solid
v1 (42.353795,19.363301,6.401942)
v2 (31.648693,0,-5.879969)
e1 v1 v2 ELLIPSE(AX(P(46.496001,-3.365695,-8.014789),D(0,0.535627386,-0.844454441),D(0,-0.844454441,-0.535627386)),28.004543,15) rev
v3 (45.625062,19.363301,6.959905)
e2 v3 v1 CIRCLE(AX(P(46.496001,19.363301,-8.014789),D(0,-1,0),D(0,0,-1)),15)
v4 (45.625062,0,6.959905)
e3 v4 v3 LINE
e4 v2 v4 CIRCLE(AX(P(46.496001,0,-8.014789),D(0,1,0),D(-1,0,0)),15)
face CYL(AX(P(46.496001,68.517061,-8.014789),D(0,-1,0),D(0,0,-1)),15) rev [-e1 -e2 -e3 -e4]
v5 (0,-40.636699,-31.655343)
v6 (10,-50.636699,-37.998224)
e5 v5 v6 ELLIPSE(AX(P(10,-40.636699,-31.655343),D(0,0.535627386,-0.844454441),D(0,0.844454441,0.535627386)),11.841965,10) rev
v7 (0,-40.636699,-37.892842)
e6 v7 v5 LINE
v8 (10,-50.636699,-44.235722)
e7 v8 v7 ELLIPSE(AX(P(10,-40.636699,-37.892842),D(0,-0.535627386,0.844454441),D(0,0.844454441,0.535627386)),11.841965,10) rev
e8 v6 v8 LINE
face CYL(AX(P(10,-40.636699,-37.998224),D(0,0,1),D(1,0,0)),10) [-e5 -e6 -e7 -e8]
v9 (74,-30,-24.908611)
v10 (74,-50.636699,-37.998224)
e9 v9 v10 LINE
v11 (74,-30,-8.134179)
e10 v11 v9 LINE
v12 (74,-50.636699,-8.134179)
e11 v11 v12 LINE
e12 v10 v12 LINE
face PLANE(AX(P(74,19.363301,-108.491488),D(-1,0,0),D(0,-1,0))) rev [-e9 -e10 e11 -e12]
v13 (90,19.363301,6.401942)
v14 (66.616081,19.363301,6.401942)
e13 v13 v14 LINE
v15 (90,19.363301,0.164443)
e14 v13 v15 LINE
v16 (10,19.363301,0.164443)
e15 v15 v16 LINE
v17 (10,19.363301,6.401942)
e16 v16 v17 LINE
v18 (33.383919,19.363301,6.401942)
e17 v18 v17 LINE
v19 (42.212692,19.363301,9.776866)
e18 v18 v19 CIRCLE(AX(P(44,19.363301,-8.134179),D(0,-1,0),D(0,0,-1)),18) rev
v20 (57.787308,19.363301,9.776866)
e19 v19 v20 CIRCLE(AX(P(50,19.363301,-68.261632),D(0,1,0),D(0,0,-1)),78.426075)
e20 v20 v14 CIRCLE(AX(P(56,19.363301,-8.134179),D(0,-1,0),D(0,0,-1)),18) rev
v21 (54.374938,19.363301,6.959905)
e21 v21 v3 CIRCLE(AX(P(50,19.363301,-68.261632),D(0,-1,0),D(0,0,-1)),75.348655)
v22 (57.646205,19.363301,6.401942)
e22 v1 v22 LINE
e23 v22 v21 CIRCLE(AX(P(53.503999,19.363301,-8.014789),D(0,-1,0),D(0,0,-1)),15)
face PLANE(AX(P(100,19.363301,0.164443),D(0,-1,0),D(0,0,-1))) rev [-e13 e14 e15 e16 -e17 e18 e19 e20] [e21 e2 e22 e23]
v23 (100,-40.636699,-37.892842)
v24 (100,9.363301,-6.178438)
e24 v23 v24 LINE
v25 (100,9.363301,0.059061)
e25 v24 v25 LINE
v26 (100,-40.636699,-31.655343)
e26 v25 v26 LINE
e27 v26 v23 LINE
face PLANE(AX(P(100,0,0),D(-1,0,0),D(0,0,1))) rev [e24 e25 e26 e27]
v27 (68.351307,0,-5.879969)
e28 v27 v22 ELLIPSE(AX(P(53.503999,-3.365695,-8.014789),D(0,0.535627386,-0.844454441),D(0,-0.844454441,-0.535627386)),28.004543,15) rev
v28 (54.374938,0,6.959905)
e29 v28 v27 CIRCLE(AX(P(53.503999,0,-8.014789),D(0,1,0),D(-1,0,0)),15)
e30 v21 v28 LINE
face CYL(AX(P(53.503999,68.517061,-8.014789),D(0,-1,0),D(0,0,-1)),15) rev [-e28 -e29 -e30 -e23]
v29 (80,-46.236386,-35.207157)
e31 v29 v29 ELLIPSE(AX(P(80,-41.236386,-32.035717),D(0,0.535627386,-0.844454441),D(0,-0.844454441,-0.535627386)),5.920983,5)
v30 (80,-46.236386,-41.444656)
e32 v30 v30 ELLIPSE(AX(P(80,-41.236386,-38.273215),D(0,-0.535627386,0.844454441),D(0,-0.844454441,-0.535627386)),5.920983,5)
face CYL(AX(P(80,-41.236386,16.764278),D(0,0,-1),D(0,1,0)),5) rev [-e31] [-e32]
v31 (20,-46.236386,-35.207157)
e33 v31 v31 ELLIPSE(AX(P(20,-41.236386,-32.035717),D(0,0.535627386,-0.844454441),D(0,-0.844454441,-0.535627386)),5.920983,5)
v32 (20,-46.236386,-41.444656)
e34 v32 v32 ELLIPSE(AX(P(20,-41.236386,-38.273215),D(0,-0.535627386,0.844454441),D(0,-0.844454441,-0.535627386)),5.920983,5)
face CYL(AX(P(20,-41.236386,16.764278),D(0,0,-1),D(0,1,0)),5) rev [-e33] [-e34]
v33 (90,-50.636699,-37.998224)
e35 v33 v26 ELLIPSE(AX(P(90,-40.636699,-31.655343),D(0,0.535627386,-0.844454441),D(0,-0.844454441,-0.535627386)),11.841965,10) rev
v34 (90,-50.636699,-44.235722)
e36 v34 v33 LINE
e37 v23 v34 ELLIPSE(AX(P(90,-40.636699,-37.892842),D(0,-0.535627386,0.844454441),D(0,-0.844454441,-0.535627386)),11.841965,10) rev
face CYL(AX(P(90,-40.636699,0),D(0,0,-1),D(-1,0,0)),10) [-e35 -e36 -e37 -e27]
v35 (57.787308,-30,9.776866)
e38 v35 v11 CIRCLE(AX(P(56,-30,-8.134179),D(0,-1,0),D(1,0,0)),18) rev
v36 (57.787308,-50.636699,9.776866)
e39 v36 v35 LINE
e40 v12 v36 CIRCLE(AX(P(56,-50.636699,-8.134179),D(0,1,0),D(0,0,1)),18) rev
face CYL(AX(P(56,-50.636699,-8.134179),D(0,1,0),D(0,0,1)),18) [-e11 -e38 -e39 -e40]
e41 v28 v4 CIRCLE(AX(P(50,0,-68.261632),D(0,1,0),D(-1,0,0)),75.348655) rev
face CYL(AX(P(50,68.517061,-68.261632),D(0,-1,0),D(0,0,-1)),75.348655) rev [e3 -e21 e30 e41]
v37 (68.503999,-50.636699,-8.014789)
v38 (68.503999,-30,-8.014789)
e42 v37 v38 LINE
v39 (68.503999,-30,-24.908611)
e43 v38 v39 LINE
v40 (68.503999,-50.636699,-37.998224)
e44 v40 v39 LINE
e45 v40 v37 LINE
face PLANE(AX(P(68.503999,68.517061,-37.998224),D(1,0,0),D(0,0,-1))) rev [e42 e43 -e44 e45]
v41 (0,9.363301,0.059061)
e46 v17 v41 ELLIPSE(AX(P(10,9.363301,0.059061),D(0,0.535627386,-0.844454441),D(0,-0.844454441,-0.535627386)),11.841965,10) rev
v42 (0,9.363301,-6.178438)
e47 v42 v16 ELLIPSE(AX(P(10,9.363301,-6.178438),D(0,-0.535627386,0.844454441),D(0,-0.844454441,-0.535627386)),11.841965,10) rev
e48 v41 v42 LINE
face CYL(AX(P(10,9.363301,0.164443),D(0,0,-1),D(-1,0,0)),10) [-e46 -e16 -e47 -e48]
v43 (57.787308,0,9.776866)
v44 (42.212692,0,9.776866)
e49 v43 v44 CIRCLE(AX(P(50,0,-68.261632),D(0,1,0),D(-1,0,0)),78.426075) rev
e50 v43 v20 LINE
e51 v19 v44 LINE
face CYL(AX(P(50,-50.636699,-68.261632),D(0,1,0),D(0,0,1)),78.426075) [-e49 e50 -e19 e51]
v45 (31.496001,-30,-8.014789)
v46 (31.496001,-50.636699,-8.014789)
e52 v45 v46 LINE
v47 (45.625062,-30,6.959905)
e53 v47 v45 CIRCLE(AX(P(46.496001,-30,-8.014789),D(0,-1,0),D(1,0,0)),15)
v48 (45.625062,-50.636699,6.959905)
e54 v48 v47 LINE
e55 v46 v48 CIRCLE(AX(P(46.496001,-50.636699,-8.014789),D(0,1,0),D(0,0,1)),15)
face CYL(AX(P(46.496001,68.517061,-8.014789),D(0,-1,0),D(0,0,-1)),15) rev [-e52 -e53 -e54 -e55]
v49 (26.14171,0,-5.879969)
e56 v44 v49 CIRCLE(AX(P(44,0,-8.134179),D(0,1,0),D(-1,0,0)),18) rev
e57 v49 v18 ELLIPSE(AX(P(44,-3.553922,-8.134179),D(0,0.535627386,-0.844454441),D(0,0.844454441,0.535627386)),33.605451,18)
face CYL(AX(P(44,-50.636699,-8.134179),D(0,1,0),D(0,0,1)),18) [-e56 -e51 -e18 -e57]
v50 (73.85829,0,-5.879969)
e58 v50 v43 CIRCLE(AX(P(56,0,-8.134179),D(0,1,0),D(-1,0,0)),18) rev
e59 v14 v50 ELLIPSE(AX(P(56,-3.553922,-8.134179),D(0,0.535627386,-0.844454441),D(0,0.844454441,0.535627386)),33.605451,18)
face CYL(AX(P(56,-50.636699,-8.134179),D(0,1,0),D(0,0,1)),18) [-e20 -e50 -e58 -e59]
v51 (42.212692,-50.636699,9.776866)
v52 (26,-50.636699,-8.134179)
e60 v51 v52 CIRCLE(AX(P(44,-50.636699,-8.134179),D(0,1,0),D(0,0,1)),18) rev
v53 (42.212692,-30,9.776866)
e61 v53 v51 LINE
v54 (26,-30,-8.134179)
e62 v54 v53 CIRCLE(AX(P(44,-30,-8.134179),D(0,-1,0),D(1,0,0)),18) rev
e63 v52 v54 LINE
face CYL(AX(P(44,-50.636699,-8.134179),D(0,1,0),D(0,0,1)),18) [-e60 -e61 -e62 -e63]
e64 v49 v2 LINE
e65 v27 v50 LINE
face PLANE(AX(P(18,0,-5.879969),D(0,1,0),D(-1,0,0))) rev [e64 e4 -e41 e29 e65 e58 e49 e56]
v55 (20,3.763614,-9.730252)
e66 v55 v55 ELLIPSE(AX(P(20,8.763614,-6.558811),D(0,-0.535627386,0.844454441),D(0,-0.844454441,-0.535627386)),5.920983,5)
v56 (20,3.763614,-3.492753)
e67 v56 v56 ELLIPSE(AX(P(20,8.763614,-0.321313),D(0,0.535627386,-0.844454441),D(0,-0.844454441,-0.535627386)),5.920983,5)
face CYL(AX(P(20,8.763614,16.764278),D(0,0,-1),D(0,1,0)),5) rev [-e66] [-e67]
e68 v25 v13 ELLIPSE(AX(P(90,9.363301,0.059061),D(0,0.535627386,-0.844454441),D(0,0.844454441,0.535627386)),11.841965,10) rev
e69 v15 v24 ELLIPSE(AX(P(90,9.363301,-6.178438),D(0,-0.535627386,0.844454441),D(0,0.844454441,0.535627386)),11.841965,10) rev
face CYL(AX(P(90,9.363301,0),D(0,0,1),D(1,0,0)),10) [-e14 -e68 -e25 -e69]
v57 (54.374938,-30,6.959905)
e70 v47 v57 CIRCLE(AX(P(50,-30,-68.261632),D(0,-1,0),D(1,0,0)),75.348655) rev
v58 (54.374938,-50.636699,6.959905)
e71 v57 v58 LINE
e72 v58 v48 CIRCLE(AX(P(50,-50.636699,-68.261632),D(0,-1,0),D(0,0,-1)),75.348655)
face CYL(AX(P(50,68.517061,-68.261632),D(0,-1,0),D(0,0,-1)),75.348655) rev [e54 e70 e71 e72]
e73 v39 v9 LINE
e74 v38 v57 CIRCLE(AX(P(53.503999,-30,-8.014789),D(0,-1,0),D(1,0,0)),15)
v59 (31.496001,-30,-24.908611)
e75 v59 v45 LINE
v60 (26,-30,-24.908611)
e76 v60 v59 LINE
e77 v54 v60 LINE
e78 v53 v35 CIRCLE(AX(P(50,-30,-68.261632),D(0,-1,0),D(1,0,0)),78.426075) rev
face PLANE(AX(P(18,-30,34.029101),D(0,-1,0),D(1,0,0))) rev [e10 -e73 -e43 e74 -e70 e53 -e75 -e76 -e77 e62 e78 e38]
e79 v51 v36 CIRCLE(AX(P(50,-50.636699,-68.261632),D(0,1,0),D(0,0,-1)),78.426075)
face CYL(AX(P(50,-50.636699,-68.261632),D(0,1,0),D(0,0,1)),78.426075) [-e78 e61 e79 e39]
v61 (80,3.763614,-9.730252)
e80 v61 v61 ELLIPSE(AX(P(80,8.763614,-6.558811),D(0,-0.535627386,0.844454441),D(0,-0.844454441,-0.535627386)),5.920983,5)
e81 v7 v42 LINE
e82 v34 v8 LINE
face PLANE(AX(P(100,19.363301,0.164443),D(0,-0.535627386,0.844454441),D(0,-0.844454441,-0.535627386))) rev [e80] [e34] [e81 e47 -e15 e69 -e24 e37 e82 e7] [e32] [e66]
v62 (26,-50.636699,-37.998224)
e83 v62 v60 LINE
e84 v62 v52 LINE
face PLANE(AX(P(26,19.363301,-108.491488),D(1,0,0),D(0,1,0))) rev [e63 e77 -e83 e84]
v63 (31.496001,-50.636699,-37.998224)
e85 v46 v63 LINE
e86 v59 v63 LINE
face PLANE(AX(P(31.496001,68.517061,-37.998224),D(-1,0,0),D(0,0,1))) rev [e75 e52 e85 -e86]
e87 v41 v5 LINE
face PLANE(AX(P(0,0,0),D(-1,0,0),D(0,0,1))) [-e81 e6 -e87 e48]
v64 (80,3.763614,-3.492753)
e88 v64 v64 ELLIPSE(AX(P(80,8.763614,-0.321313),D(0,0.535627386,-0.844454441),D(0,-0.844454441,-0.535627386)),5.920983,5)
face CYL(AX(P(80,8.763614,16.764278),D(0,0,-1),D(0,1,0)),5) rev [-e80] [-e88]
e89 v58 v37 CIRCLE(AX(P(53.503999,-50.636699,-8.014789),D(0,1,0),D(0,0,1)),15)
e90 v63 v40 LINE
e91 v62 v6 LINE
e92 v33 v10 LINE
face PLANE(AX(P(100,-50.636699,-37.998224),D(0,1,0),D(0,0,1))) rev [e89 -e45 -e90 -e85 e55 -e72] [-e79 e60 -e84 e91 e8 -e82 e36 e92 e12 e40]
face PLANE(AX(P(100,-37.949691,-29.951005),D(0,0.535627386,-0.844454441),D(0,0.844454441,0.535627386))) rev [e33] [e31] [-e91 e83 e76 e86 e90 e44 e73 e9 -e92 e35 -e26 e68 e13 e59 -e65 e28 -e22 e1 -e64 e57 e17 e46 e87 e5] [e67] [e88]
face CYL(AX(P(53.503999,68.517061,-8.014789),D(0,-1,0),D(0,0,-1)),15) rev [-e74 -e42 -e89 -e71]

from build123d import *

# Parameters (mm, degrees)
BOSS_EXTRUDE1_DEPTH = 100
SKETCH2_R           = 5
CUT_EXTRUDE1_DEPTH  = 61
BOSS_EXTRUDE3_DEPTH = 70
BOSS_EXTRUDE4_REACH = 124.997
SKETCH4_W           = 48
SKETCH4_H           = 70
CUT_EXTRUDE2_REACH  = 131.834
FILLET1_R           = 10
CUT_EXTRUDE3_DEPTH  = 56
FILLET3_R           = 18
FILLET4_R           = 15
FILLET5_R           = 15


with BuildPart() as part:
    # Sketch1 → Boss-Extrude1 (new body)
    with BuildSketch(Plane(origin=(0, 0, 0), x_dir=(0, 0, -1), z_dir=(1, 0, 0))):
        Polygon((9.31960102, -5.422823355), (-6.40194197, 19.363300607), (-0.164443236, 19.363300607), (44.235722397, -50.636699393), (37.998223663, -50.636699393), (29.951005386, -37.94969088), align=None)
    extrude(amount=BOSS_EXTRUDE1_DEPTH)

    # Sketch2 → Cut-Extrude1 (cut)
    with BuildSketch(Plane(origin=(0, 0, -44.235722397), x_dir=(-1, 0, 0), z_dir=(0, 0, -1))):
        with Locations(Location((-80, -41.23638567, 0), (0, 0, 270))):
            Circle(SKETCH2_R)
        with Locations(Location((-20, -41.23638567, 0), (0, 0, 270))):
            Circle(SKETCH2_R)
        with Locations(Location((-20, 8.76361433, 0), (0, 0, 270))):
            Circle(SKETCH2_R)
        with Locations(Location((-80, 8.76361433, 0), (0, 0, 270))):
            Circle(SKETCH2_R)
    extrude(amount=-CUT_EXTRUDE1_DEPTH, mode=Mode.SUBTRACT)

    # Boss-Extrude4: up to this face of the body (flat: up to its plane)
    boss_extrude4_end = Plane(part.part.faces().sort_by_distance((50, -15.608520887, -15.780267556))[0])
    # Sketch4 → Boss-Extrude4 (add, up to the picked face)
    with BuildSketch(Plane(origin=(0, 0, 6.40194197), x_dir=(-1, 0, 0), z_dir=(0, 0, -1)), mode=Mode.PRIVATE) as boss_extrude4_sk1:
        with Locations((-50, -15.636699393)):
            Rectangle(SKETCH4_W, SKETCH4_H)
    boss_extrude4_tool1 = split(extrude(boss_extrude4_sk1.sketch, amount=BOSS_EXTRUDE4_REACH, mode=Mode.PRIVATE), bisect_by=boss_extrude4_end, keep=Keep.BOTH, mode=Mode.PRIVATE)


with BuildPart() as body_2:
    # Sketch3 → Boss-Extrude3 (new body)
    with BuildSketch(Plane(origin=(0, 19.363300607, 0), x_dir=(1, 0, 0), z_dir=(0, 1, 0))):
        with BuildLine():
            Line((26, -6.40194197), (74, -6.40194197))
            ThreePointArc((74, -6.40194197), (50, -10.164443236), (26, -6.40194197))
        make_face()
    extrude(amount=-BOSS_EXTRUDE3_DEPTH)


with BuildPart() as part_1:
    add(part.part)

    add(body_2.part)  # Boss-Extrude4 merges body 2
    add(boss_extrude4_tool1.solids().sort_by(Axis((50, -15.636699, 6.401942), (0, 0, -1)))[0])

    # Cut-Extrude2: up to this face of the body (flat: up to its plane)
    cut_extrude2_end = Plane(part_1.part.faces().sort_by_distance((87.661220736, -15.580052964, -15.762210692))[0])
    # Sketch5 → Cut-Extrude2 (cut, up to the picked face)
    with BuildSketch(Plane.XZ.offset(50.636699393), mode=Mode.PRIVATE) as cut_extrude2_sk1:
        with BuildLine():
            Line((68.503998914, -37.998223663), (31.496001086, -37.998223663))
            Line((31.496001086, -37.998223663), (31.496001086, 4.779601344))
            ThreePointArc((31.496001086, 4.779601344), (50, 7.087022557), (68.503998914, 4.779601344))
            Line((68.503998914, 4.779601344), (68.503998914, -37.998223663))
        make_face()
    cut_extrude2_tool1 = split(extrude(cut_extrude2_sk1.sketch, amount=-CUT_EXTRUDE2_REACH, mode=Mode.PRIVATE), bisect_by=cut_extrude2_end, keep=Keep.BOTH, mode=Mode.PRIVATE)
    add(cut_extrude2_tool1.solids().sort_by(Axis((50, -50.636699, -15.832469), (0, 1, 0)))[0], mode=Mode.SUBTRACT)

    # Fillet1
    # the kernel refuses this fillet: 10 mm, written as the material it takes off along each edge
    with BuildSketch(Plane(origin=(100, -50.636699393, -69.235722397), x_dir=(-1, 0, 0), z_dir=(0, 0, 1)), Plane(origin=(100, 19.363300607, 31.40194197), x_dir=(-1, 0, 0), z_dir=(0, 0, -1))) as fillet1_piece_1:
        with BuildLine():
            CenterArc((FILLET1_R, -FILLET1_R), FILLET1_R, 90, 90)
            Line((0, -FILLET1_R), (0, 0))
            Line((0, 0), (FILLET1_R, 0))
        make_face()
    extrude(amount=56.237498734, mode=Mode.SUBTRACT)
    with BuildSketch(Plane(origin=(0, -50.636699393, -69.235722397), x_dir=(1, 0, 0), z_dir=(0, 0, 1)), Plane(origin=(0, 19.363300607, 31.40194197), x_dir=(1, 0, 0), z_dir=(0, 0, -1))) as fillet1_piece_2:
        with BuildLine():
            CenterArc((FILLET1_R, FILLET1_R), FILLET1_R, 180, 90)
            Line((0, FILLET1_R), (0, 0))
            Line((0, 0), (FILLET1_R, 0))
        make_face()
    extrude(amount=56.237498734, mode=Mode.SUBTRACT)

    # Sketch7 → Cut-Extrude3 (cut)
    with BuildSketch(Plane(origin=(74, 0, 0), x_dir=(0, 0, -1), z_dir=(1, 0, 0))):
        Polygon((5.879968804, 0), (-34.029101203, 0), (-34.029101203, -30), (24.908611218, -30), align=None)
    extrude(amount=-CUT_EXTRUDE3_DEPTH, mode=Mode.SUBTRACT)

    # Fillet3
    # the kernel refuses this fillet: 18 mm, written as the material it takes off along each edge
    with BuildSketch(Plane(origin=(74, 60.763896609, 6.40194197), x_dir=(-0.9790132085588953, 0, 0.20379680435967867), z_dir=(0, -1, 0))) as fillet3_piece_1_section:
        with BuildLine():
            CenterArc((14.659822692, 17.8993972), FILLET3_R, 191.759074187, 84.301431918)
            Line((-2.962415062, 14.231054722), (0, 0))
            ThreePointArc((0, 0), (8.2801192, -0.43832682), (16.560238401, 0))
        make_face()
    fillet3_piece_1 = extrude(amount=102.16449261, mode=Mode.PRIVATE)
    fillet3_piece_1 = split(fillet3_piece_1, bisect_by=Plane(origin=(69.993439145, 10.97404697, 1.080738384), z_dir=(0, -0.5356273864218708, 0.8444544409942292)), keep=Keep.TOP, mode=Mode.PRIVATE)
    add(fillet3_piece_1, mode=Mode.SUBTRACT)
    with BuildSketch(Plane(origin=(74, 11.400596002, 6.40194197), x_dir=(-0.9790132085588953, 0, 0.2037968043596786), z_dir=(0, -1, 0))) as fillet3_piece_2_section:
        with BuildLine():
            CenterArc((14.659822692, 17.8993972), FILLET3_R, 191.759074187, 84.301431918)
            Line((-2.962415062, 14.231054722), (0, 0))
            ThreePointArc((0, 0), (8.2801192, -0.43832682), (16.560238401, 0))
        make_face()
    fillet3_piece_2 = extrude(amount=103.437891396, mode=Mode.PRIVATE)
    fillet3_piece_2 = split(fillet3_piece_2, bisect_by=Plane(origin=(70.341248141, 8.727743457, -0.34406516), z_dir=(0, -0.5356273864218708, 0.8444544409942292)), keep=Keep.TOP, mode=Mode.PRIVATE)
    add(fillet3_piece_2, mode=Mode.SUBTRACT)
    with BuildSketch(Plane(origin=(26, 11.400596002, 6.40194197), x_dir=(0, 0, -1), z_dir=(0, -1, 0))) as fillet3_piece_3_section:
        with BuildLine():
            CenterArc((14.536121267, 18), FILLET3_R, 185.698568082, 84.301431918)
            ThreePointArc((-3.374923665, 16.212692131), (-2.116589579, 8.01701646), (0, 0))
            Line((0, 0), (14.536121267, 0))
        make_face()
    fillet3_piece_3 = extrude(amount=103.437891396, mode=Mode.PRIVATE)
    fillet3_piece_3 = split(fillet3_piece_3, bisect_by=Plane(origin=(29.658751859, 8.727743457, -0.344065159), z_dir=(0, -0.5356273864218708, 0.8444544409942292)), keep=Keep.TOP, mode=Mode.PRIVATE)
    add(fillet3_piece_3, mode=Mode.SUBTRACT)
    with BuildSketch(Plane(origin=(26, 60.763896609, 6.40194197), x_dir=(0, 0, -1), z_dir=(0, -1, 0))) as fillet3_piece_4_section:
        with BuildLine():
            CenterArc((14.536121267, 18), FILLET3_R, 185.698568082, 84.301431918)
            ThreePointArc((-3.374923665, 16.212692131), (-2.116589579, 8.01701646), (0, 0))
            Line((0, 0), (14.536121267, 0))
        make_face()
    fillet3_piece_4 = extrude(amount=102.16449261, mode=Mode.PRIVATE)
    fillet3_piece_4 = split(fillet3_piece_4, bisect_by=Plane(origin=(30.006560852, 10.974046968, 1.080738383), z_dir=(0, -0.5356273864218708, 0.8444544409942292)), keep=Keep.TOP, mode=Mode.PRIVATE)
    add(fillet3_piece_4, mode=Mode.SUBTRACT)

    # Fillet4
    fillet4_edges = [part_1.edges().sort_by_distance(p)[0] for p in [
        (68.503998914, -40.318349696, 4.779601344),
        (31.496001086, -40.318349696, 4.779601344),
    ]]
    fillet(fillet4_edges, radius=FILLET4_R)

    # Fillet5
    # the kernel refuses this fillet: 15 mm, written as the material it adds along each edge
    with BuildSketch(Plane(origin=(68.503998914, 0, 4.779601344), x_dir=(0, 0, -1), z_dir=(0, 1, 0))) as fillet5_piece_1_section:
        with BuildLine():
            CenterArc((12.794390285, 15), FILLET5_R, 183.32861315, 86.67138685)
            ThreePointArc((-2.18030389, 14.12906122), (-1.426006953, 7.012703672), (0, 0))
            Line((0, 0), (12.794390285, 0))
        make_face()
    fillet5_piece_1 = extrude(amount=52.546307376, mode=Mode.PRIVATE)
    fillet5_piece_1 = split(fillet5_piece_1, bisect_by=Plane(origin=(64.873583949, 12.366179926, -4.273747009), z_dir=(0, -0.5356273864218707, 0.8444544409942292)), keep=Keep.TOP, mode=Mode.PRIVATE)
    fillet5_piece_1 = split(fillet5_piece_1, bisect_by=Plane(origin=(64.873583949, 19.363300607, 3.531905566), z_dir=(0, -1, 0)), keep=Keep.TOP, mode=Mode.PRIVATE)
    add(fillet5_piece_1)
    with BuildSketch(Plane(origin=(31.496001086, 0, 4.779601344), x_dir=(0.9883021898179025, 0, 0.15250830010572736), z_dir=(0, 1, 0))) as fillet5_piece_2_section:
        with BuildLine():
            CenterArc((12.873282134, 14.932348438), FILLET5_R, 188.772314309, 86.67138685)
            Line((-1.951250713, 12.644723937), (0, 0))
            ThreePointArc((0, 0), (7.148148292, -0.339830278), (14.296296583, 0))
        make_face()
    fillet5_piece_2 = extrude(amount=52.546307376, mode=Mode.PRIVATE)
    fillet5_piece_2 = split(fillet5_piece_2, bisect_by=Plane(origin=(35.126416052, 12.366179929, -4.273747008), z_dir=(0, -0.5356273864218707, 0.8444544409942292)), keep=Keep.TOP, mode=Mode.PRIVATE)
    fillet5_piece_2 = split(fillet5_piece_2, bisect_by=Plane(origin=(35.126416052, 19.363300607, 3.531905566), z_dir=(0, -1, 0)), keep=Keep.TOP, mode=Mode.PRIVATE)
    add(fillet5_piece_2)


solid = part_1.part
